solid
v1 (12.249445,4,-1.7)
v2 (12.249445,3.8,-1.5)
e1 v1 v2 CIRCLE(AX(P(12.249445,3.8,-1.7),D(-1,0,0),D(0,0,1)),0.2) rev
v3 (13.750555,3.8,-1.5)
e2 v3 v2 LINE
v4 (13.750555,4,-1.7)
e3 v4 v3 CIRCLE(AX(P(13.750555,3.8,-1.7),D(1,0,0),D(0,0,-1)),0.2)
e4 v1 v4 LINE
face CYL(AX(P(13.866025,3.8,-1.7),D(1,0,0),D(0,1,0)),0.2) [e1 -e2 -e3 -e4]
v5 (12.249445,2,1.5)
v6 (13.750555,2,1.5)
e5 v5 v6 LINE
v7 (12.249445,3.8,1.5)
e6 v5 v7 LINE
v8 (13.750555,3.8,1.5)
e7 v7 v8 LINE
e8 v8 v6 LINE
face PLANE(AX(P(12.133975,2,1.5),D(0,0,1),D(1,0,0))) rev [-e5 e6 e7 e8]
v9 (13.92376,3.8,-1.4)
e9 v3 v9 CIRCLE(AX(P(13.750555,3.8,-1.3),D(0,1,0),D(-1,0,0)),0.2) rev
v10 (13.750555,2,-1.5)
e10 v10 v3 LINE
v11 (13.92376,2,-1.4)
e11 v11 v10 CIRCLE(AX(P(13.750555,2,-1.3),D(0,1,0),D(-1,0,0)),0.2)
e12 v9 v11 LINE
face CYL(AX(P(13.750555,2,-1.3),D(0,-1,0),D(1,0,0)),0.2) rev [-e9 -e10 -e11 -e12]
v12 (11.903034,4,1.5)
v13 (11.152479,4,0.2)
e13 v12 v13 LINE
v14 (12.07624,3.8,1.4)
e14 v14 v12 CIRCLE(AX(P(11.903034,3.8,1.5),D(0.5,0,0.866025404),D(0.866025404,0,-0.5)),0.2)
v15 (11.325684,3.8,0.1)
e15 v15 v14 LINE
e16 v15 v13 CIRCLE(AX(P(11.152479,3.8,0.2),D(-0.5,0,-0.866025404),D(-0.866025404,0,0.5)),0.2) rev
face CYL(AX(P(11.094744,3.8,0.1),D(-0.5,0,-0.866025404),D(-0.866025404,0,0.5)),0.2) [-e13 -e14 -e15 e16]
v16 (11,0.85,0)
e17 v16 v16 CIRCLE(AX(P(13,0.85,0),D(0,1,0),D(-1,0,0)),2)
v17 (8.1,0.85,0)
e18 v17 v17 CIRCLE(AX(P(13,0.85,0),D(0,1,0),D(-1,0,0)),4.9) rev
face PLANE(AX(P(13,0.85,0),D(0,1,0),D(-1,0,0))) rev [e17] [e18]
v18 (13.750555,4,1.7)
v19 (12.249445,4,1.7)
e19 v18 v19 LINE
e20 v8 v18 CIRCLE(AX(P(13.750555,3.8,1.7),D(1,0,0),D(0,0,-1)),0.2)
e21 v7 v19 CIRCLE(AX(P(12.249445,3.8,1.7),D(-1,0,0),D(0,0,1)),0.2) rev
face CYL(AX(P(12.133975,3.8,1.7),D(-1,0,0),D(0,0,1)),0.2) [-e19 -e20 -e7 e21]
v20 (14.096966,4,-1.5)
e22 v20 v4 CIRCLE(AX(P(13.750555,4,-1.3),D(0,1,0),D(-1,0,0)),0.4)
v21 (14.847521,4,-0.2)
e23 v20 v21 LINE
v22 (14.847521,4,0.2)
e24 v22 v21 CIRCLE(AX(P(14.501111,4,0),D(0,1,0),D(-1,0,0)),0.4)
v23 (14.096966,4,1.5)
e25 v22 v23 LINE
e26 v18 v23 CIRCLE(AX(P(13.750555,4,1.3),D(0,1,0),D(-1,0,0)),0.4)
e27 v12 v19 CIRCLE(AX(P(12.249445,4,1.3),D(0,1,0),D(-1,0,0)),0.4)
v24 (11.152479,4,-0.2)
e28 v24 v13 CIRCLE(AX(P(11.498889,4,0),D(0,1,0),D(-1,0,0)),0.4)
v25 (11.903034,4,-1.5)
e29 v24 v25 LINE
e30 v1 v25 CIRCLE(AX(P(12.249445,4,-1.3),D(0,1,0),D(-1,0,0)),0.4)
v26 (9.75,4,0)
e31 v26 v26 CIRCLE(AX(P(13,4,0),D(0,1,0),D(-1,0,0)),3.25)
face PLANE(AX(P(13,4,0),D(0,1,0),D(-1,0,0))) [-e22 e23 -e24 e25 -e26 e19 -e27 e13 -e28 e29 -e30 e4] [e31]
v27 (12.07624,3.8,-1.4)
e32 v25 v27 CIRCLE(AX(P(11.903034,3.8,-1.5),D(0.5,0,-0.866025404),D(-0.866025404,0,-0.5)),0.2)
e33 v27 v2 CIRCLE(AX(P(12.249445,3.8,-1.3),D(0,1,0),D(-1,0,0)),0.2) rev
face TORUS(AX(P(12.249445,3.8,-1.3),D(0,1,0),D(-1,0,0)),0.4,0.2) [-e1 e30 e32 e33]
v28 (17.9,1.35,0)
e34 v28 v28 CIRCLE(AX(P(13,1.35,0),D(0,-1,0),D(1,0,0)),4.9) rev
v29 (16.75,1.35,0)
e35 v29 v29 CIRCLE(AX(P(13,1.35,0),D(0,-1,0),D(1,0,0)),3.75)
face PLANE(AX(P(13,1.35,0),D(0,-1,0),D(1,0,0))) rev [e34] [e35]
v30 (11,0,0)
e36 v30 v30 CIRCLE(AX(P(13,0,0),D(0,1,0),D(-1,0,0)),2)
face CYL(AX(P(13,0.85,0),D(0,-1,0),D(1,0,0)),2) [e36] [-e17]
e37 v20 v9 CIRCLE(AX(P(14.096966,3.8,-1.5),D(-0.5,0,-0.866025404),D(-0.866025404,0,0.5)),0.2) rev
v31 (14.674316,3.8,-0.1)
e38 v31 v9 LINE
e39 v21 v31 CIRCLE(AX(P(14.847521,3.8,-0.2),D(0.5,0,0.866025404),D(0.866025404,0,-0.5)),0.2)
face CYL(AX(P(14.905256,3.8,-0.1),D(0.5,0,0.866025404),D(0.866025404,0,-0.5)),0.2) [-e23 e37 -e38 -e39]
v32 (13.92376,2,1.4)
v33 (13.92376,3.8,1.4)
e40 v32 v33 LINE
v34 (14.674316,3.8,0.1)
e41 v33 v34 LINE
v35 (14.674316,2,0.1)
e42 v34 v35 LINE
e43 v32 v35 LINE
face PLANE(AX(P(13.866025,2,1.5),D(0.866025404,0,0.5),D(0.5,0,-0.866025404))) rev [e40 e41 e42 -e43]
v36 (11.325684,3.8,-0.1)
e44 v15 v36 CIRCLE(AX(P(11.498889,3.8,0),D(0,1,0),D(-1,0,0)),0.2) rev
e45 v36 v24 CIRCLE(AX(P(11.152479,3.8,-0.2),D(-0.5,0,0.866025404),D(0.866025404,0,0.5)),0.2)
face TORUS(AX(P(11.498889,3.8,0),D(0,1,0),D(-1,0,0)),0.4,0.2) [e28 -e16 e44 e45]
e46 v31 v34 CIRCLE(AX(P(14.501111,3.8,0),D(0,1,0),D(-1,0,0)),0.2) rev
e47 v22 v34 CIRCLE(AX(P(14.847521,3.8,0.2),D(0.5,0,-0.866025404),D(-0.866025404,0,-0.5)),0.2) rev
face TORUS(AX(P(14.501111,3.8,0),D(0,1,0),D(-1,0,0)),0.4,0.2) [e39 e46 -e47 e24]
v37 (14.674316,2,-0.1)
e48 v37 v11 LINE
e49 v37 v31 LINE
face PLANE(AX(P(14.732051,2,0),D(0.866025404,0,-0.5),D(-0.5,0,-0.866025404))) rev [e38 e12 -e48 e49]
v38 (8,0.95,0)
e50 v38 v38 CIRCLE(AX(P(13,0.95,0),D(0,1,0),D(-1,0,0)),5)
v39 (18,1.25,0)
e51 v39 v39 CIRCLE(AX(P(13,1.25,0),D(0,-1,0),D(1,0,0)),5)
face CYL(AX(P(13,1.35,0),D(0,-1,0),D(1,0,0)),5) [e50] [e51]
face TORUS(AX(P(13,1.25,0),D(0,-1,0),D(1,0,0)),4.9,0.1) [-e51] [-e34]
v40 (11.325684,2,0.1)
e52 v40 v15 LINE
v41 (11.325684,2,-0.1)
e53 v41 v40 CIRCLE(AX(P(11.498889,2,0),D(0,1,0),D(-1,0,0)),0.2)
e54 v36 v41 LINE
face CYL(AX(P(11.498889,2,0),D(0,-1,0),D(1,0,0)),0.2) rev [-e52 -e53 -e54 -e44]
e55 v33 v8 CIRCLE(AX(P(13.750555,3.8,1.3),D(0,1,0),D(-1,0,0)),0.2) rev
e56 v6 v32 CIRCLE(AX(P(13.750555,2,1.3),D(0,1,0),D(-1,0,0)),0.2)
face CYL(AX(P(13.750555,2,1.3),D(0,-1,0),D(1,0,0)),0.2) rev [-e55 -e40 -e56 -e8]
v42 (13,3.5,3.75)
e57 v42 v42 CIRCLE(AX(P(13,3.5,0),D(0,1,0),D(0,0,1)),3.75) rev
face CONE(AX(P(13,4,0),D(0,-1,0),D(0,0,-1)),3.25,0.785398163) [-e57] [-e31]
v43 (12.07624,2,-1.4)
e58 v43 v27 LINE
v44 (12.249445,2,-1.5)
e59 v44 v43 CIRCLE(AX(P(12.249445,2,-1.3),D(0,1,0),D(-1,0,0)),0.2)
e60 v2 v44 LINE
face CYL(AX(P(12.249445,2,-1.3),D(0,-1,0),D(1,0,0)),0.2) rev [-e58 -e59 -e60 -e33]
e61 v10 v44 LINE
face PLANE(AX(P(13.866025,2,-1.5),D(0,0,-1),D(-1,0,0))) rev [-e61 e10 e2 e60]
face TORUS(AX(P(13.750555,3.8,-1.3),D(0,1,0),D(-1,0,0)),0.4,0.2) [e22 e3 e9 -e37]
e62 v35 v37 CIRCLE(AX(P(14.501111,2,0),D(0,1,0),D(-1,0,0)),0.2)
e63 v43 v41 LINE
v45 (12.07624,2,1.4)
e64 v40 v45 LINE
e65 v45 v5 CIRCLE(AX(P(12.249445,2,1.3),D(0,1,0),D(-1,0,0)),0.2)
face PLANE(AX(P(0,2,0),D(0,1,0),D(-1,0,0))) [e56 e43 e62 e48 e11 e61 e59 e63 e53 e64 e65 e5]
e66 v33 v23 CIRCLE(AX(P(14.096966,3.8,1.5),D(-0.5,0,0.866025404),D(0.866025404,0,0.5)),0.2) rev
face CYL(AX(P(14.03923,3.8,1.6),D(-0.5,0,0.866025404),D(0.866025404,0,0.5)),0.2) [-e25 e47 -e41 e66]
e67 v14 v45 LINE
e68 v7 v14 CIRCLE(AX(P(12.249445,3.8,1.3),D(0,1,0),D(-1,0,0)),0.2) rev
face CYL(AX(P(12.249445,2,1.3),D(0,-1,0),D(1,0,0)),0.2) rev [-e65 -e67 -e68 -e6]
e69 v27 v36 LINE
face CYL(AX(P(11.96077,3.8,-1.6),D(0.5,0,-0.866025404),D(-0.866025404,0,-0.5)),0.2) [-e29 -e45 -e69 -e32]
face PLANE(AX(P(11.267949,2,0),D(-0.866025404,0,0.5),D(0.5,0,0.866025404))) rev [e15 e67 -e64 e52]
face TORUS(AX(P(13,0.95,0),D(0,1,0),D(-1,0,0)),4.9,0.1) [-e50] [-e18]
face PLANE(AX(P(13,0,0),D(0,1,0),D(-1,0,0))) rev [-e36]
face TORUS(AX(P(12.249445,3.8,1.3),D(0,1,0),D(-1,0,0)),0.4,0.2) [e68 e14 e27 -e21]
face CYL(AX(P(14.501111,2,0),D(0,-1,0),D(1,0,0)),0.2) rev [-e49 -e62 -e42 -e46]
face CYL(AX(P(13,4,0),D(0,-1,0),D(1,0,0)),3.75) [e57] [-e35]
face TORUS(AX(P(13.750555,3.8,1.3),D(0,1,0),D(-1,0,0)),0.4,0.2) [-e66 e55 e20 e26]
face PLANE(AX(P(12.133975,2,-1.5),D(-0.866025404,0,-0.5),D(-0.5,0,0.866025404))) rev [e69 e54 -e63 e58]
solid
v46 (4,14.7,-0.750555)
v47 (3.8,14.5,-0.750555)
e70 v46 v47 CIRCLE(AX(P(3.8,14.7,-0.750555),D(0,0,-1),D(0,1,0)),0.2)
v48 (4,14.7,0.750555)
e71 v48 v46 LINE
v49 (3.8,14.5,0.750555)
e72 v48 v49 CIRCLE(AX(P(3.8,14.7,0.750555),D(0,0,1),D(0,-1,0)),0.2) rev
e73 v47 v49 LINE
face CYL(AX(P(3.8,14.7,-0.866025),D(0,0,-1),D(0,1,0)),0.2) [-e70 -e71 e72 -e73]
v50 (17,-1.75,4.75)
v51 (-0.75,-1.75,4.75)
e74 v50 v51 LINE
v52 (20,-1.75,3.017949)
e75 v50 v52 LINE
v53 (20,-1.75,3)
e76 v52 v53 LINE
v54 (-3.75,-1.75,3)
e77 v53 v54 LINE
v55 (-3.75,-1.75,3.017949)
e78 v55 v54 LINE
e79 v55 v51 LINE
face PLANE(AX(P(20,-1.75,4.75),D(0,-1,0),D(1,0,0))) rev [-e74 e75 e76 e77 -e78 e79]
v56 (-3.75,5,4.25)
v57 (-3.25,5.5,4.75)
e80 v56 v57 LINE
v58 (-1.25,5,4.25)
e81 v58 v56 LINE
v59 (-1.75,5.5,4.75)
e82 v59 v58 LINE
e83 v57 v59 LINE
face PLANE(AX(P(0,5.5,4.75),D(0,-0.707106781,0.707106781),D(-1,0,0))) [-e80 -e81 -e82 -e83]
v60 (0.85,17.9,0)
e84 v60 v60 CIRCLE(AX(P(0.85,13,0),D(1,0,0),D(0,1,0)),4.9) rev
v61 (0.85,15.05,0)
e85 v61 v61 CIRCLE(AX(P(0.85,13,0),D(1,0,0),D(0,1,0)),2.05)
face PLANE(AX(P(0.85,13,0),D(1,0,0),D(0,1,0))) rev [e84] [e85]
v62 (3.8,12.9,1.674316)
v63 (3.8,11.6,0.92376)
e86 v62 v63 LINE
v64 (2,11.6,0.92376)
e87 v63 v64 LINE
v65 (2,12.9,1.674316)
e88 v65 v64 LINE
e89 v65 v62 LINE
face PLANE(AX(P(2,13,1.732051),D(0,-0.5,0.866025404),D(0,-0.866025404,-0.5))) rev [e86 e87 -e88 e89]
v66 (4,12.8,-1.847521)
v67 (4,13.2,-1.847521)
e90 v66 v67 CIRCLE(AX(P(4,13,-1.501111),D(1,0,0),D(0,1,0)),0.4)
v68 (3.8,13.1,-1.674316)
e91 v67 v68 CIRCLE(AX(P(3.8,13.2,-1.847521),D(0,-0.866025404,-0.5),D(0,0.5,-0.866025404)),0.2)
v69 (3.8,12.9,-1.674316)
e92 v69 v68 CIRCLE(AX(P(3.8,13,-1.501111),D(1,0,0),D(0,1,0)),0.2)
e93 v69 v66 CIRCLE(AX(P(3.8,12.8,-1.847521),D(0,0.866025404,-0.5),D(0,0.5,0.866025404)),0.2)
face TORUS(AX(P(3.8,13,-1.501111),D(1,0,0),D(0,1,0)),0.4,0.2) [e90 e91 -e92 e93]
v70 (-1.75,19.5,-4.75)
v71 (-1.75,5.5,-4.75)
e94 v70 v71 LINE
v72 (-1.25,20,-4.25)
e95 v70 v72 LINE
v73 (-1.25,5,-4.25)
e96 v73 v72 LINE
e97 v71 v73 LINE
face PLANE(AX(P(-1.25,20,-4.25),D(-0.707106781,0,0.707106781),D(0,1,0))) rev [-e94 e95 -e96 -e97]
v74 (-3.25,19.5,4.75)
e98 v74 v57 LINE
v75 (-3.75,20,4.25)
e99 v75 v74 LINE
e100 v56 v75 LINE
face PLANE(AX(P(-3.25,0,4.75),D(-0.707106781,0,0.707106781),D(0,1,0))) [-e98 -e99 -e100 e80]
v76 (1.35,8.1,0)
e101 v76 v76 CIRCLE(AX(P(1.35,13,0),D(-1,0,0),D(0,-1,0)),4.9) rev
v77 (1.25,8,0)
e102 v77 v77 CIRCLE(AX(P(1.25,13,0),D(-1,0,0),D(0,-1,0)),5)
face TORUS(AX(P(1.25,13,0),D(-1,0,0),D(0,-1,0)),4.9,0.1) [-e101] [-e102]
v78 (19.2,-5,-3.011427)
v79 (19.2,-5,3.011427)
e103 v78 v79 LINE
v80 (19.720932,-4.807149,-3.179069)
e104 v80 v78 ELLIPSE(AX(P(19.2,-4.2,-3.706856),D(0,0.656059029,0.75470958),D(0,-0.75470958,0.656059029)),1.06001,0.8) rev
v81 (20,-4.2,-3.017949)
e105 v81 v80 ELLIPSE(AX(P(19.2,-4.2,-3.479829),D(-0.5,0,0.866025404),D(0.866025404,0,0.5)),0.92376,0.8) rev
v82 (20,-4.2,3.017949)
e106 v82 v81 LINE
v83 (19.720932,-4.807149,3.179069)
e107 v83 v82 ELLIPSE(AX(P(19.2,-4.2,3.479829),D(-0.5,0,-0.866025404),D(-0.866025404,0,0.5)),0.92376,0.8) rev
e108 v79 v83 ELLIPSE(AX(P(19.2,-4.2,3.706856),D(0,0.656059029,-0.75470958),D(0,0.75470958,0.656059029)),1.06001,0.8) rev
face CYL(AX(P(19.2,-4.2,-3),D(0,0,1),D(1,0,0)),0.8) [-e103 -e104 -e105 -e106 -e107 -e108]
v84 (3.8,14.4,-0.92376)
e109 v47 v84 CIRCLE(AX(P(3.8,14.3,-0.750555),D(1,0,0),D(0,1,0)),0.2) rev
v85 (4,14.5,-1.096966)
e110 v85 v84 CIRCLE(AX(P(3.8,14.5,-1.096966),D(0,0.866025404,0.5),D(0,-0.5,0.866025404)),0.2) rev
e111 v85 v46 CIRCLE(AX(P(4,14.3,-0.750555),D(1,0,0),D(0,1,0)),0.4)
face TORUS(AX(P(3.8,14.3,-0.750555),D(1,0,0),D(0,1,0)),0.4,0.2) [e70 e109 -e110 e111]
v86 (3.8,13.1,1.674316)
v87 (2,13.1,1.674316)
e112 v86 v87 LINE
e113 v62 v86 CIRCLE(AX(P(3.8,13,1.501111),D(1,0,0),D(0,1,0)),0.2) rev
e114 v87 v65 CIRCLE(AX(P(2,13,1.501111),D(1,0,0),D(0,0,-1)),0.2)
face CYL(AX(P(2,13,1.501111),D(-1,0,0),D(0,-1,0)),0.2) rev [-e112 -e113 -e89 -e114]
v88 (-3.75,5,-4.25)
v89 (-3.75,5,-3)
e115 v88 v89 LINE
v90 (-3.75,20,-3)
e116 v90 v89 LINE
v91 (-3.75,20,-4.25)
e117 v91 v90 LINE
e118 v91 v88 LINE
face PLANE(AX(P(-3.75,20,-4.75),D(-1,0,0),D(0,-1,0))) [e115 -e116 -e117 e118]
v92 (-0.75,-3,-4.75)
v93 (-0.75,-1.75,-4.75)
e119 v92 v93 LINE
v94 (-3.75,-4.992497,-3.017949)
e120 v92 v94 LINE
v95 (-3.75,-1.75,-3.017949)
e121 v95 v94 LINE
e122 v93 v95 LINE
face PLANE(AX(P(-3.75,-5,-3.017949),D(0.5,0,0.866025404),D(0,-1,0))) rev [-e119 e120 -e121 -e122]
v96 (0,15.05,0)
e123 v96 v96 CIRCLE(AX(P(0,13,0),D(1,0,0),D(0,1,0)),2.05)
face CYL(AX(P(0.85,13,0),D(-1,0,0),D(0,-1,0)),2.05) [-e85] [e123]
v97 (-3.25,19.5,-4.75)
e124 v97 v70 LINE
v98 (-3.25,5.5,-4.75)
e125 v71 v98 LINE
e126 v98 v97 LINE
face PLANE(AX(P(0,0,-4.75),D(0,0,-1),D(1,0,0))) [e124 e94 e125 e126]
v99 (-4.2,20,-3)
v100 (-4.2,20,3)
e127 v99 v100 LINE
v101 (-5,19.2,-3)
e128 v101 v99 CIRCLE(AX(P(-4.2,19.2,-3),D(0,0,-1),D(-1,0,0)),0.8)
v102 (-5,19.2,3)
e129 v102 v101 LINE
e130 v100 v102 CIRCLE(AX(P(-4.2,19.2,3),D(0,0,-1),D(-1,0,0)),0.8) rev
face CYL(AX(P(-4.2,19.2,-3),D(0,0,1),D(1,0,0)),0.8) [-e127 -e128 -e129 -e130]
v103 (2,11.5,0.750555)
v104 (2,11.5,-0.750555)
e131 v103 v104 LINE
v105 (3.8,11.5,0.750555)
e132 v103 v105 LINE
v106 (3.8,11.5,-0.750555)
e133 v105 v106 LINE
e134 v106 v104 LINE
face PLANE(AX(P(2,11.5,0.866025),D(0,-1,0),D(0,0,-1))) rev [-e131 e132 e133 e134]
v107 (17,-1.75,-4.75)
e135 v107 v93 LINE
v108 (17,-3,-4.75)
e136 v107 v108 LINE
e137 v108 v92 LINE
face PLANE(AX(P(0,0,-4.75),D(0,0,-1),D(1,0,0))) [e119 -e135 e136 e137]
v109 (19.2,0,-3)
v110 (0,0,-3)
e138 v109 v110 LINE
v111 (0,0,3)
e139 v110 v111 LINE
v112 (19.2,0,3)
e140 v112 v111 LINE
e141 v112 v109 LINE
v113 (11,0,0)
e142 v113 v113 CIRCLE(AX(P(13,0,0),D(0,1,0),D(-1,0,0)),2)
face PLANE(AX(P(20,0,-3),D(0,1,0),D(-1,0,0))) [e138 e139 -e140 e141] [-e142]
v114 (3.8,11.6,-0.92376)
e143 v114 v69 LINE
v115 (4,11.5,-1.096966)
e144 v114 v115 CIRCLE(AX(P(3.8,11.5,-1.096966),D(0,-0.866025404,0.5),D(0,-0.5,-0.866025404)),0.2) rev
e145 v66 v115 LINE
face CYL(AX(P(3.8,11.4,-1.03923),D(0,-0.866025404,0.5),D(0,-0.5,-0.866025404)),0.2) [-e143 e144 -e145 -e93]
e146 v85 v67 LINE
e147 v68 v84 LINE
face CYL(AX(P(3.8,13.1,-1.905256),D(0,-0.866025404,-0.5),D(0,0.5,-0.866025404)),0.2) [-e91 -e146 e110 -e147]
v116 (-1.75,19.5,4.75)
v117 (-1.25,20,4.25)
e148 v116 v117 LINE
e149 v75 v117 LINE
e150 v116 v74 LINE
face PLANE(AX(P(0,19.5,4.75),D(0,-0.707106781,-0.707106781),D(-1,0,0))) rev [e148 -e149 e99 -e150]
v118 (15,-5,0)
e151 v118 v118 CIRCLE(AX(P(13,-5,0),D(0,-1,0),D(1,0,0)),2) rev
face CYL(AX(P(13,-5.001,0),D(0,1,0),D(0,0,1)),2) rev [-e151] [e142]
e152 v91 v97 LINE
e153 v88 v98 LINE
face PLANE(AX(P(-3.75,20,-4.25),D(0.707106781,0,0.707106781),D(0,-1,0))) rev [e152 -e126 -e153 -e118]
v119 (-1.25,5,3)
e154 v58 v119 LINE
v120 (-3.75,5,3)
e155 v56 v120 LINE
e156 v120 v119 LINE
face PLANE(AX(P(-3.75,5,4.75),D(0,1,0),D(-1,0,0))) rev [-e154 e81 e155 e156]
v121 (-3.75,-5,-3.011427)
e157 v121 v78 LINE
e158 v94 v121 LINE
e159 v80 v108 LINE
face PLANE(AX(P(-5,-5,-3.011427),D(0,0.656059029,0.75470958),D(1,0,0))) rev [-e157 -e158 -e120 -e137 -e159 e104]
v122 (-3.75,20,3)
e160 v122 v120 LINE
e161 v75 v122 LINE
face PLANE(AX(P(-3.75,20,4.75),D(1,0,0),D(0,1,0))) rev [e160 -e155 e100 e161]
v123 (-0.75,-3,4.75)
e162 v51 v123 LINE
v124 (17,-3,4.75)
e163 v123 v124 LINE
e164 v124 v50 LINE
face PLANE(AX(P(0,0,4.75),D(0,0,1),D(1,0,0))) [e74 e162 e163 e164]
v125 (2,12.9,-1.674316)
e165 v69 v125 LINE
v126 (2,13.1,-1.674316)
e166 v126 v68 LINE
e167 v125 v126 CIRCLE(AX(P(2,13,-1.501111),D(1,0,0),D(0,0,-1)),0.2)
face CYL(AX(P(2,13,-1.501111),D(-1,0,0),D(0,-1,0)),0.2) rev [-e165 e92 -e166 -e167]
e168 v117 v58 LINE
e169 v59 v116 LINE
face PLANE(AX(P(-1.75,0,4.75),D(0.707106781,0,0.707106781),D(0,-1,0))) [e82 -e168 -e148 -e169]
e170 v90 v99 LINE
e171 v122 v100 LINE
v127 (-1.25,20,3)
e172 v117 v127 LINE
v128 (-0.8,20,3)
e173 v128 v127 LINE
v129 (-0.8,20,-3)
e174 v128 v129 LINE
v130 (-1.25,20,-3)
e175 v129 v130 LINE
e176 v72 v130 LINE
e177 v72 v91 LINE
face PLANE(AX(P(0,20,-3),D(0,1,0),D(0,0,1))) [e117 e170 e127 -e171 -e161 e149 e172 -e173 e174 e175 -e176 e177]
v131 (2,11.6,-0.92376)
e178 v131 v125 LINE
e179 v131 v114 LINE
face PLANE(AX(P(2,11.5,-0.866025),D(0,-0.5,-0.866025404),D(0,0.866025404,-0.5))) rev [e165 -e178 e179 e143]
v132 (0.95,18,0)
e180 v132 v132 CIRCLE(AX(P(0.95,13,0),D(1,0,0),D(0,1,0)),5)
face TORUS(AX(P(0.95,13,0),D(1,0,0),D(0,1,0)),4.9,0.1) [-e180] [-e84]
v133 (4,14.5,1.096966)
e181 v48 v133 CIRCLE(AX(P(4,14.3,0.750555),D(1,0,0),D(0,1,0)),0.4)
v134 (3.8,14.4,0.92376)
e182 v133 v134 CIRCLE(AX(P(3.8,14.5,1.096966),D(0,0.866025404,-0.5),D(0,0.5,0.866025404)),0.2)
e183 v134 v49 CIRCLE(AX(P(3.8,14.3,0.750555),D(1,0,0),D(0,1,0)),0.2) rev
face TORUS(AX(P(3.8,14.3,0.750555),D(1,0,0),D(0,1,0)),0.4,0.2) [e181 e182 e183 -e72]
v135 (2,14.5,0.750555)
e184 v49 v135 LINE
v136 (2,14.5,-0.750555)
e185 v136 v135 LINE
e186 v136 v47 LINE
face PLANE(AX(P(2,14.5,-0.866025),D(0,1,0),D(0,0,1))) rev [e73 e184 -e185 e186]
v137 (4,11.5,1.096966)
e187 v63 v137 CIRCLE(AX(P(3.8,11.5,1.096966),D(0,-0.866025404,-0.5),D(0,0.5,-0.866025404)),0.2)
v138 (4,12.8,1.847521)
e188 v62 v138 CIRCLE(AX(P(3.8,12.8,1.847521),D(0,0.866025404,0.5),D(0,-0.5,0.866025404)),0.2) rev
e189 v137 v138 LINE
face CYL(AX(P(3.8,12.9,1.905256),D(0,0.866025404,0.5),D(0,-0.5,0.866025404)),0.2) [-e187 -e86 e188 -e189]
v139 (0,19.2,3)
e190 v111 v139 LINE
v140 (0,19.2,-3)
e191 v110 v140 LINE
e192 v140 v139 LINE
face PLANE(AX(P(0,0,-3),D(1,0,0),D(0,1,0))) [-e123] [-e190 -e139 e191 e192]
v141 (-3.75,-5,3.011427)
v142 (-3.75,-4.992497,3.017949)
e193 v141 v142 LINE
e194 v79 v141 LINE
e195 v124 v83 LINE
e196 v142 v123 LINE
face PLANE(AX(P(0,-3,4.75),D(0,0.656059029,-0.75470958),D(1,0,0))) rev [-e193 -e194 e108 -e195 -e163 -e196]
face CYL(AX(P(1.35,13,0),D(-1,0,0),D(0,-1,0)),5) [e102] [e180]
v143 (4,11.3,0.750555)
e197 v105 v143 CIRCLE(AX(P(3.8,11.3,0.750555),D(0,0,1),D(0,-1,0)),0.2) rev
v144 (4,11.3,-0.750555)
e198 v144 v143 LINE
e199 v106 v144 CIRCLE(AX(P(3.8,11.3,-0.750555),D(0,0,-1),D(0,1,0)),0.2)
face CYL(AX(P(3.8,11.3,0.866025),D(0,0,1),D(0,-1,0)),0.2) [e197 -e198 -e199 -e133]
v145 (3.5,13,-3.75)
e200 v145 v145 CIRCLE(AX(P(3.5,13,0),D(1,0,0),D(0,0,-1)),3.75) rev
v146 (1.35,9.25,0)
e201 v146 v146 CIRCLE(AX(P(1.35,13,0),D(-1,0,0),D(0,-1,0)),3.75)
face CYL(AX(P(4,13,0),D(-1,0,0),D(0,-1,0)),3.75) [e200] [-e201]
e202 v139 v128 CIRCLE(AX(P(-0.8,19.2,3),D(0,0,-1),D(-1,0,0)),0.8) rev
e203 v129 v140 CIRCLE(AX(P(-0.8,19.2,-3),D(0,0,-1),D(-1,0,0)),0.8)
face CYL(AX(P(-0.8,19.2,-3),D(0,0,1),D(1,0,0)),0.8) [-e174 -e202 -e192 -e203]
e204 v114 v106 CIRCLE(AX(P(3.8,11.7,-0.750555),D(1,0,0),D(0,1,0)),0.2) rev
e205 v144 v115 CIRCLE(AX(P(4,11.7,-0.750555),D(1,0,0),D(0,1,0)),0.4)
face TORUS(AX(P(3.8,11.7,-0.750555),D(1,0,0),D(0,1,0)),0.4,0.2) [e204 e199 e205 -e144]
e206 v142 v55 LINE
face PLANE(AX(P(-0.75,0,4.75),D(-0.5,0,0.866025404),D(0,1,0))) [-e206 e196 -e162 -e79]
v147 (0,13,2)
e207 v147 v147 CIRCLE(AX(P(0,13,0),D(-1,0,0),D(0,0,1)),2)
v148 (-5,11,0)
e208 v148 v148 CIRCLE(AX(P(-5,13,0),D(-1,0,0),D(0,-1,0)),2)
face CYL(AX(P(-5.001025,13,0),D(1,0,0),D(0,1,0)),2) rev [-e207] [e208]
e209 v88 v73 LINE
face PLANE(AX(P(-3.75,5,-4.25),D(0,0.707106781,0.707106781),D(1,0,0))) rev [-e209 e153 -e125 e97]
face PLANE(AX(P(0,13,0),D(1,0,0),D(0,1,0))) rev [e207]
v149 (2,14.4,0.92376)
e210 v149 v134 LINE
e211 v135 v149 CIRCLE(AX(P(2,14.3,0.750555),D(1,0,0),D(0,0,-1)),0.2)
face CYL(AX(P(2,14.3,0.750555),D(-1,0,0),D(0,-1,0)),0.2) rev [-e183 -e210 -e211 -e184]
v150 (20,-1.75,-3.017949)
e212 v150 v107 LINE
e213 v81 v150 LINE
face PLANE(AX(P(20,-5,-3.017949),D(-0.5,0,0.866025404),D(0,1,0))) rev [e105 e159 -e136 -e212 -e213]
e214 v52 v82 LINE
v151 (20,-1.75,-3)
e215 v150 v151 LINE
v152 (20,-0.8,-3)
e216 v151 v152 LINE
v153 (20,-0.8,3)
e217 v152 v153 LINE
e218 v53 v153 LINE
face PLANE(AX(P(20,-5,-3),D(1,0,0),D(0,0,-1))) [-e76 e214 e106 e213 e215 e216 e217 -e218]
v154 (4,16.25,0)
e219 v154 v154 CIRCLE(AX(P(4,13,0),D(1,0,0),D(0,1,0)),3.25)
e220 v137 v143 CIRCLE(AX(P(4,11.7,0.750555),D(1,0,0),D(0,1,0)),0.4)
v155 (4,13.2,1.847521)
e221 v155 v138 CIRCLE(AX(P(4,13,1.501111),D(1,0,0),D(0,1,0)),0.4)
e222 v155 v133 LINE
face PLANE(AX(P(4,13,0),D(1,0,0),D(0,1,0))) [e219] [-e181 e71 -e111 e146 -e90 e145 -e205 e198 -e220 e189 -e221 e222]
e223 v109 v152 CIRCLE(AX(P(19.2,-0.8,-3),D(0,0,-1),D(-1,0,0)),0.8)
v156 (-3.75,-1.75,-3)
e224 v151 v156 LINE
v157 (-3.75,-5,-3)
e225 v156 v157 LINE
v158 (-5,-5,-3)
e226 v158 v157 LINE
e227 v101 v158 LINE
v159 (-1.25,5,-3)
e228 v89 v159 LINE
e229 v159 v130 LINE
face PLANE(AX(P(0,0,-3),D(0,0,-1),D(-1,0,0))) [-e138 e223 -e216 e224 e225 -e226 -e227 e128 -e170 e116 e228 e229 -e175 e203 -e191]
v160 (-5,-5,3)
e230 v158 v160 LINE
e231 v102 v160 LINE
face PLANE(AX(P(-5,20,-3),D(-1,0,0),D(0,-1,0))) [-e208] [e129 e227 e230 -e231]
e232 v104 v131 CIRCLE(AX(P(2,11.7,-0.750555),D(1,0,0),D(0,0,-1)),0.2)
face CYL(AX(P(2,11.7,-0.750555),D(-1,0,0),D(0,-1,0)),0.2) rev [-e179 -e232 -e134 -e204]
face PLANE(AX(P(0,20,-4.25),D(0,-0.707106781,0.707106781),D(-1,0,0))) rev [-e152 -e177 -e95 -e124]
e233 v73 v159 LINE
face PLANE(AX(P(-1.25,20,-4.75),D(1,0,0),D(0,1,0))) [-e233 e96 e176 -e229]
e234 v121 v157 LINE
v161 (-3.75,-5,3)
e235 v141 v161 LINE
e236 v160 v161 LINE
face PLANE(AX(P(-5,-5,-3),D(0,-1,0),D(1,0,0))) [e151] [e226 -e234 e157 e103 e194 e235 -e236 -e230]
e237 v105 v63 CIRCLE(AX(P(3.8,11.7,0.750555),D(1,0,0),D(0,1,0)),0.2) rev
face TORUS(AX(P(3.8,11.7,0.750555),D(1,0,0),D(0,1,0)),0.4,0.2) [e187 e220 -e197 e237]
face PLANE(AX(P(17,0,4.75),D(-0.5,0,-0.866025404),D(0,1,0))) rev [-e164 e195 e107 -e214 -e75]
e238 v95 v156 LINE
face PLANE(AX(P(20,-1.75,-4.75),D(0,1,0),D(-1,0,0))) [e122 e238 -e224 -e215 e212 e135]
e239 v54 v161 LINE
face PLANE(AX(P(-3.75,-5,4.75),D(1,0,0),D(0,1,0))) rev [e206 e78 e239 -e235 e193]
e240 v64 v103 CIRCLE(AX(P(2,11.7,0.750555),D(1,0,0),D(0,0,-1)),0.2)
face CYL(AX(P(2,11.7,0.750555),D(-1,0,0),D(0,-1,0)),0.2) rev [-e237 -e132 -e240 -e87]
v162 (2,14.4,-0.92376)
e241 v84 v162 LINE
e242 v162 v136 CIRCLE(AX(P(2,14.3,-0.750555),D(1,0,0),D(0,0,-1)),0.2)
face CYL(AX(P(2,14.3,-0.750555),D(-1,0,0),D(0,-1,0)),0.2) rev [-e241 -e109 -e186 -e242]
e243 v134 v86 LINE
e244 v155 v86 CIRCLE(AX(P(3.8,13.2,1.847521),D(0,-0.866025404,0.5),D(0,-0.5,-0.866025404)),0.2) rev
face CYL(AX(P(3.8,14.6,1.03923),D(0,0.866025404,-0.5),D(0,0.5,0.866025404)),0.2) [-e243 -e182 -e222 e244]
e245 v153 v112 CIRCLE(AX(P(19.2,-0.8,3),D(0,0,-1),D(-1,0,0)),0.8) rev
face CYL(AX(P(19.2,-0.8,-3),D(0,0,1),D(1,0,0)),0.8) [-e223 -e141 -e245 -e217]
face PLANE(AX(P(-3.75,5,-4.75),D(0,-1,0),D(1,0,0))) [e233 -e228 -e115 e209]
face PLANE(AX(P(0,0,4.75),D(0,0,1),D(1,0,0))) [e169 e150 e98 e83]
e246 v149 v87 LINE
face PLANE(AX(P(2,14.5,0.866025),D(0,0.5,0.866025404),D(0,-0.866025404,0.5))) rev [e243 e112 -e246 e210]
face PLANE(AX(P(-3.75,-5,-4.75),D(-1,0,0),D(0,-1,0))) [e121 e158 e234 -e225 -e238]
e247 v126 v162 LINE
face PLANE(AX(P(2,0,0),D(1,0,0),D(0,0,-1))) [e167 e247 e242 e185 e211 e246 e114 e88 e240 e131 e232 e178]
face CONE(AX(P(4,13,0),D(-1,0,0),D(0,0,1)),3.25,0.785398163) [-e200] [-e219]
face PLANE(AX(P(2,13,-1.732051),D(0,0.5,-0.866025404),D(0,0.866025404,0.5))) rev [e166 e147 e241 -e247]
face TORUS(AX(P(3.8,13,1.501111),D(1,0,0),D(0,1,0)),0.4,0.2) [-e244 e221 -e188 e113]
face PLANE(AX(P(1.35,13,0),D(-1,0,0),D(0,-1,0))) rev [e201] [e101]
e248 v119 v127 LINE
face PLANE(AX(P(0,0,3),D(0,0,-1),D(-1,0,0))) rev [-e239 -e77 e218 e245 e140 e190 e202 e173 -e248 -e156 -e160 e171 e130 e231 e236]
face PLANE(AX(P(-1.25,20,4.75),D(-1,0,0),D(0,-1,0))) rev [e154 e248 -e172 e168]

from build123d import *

# Parameters (mm, degrees)
EXTRUDE1_DEPTH      = 3
EXTRUDE1_DEPTH_BACK = 3
SKETCH2_W           = 2.5
SKETCH2_H           = 15
SKETCH2_W_2         = 23.75
SKETCH2_H_2         = 3.25
EXTRUDE2_DEPTH      = 1.75
CHAMFER1_SIZE       = 3
CHAMFER1_SIZE2      = 1.732050808
CHAMFER2_SIZE       = 2
CHAMFER2_SIZE2      = 1.738573476
CHAMFER3_SIZE       = 0.5
EXTRUDE3_REACH      = 30.68
SKETCH4_R           = 2
FILLET1_R           = 0.8
SKETCH5_R           = 3.75
BOSS_EXTRUDE1_DEPTH = 4
CHAMFER4_SIZE       = 0.5
CUT_EXTRUDE1_DEPTH  = 2
FILLET2_R           = 0.2
SKETCH7_R           = 3.75
BOSS_EXTRUDE2_DEPTH = 4
CHAMFER5_SIZE       = 0.5
CUT_EXTRUDE2_DEPTH  = 2
FILLET3_R           = 0.2
CUT_EXTRUDE3_START  = 0.85
SKETCH9_R           = 4.868453385
SKETCH9_R_2         = 2
CUT_EXTRUDE3_DEPTH  = 0.85
SKETCH10_R          = 4.694826999
SKETCH10_R_2        = 2.05
CUT_EXTRUDE8_DEPTH  = 0.85
CHAMFER6_SIZE       = 0.2
CHAMFER7_SIZE       = 0.2
SKETCH12_R          = 5
BOSS_EXTRUDE3_DEPTH = 0.5
SKETCH13_R          = 5
BOSS_EXTRUDE4_DEPTH = 0.5
FILLET4_R           = 0.1
FILLET5_R           = 0.1


# Read off the part's stored shape, not the designer's step: Mirror1
with BuildPart() as part:
    # Sketch1 → Extrude1 (new, two sides: drawn at the far end of the back side and taken through both)
    with BuildSketch(Plane.XY.offset(-EXTRUDE1_DEPTH_BACK)):
        Polygon((0, 0), (0, 20), (-5, 20), (-5, -5), (20, -5), (20, 0), align=None)
    extrude(amount=EXTRUDE1_DEPTH + EXTRUDE1_DEPTH_BACK)

    # Sketch2 → Extrude2 (add)
    with BuildSketch(Plane.XY.offset(3)):
        with Locations((-2.5, 12.5)):
            Rectangle(SKETCH2_W, SKETCH2_H)
        with Locations((8.125, -3.375)):
            Rectangle(SKETCH2_W_2, SKETCH2_H_2)
    extrude(amount=EXTRUDE2_DEPTH)

    # Chamfer1
    chamfer1_edges = [part.edges().sort_by_distance(p)[0] for p in [
        (20, -3.375, 4.75),
        (-3.75, -3.375, 4.75),
    ]]
    chamfer1_side = [part.faces().sort_by_distance(p)[0] for p in [
        (8.125, -3.375, 4.75),
    ]]
    chamfer(chamfer1_edges, length=CHAMFER1_SIZE, length2=CHAMFER1_SIZE2, reference=chamfer1_side[0])

    # Chamfer2
    chamfer2_edges = [part.edges().sort_by_distance(p)[0] for p in [
        (8.125, -5, 4.75),
    ]]
    chamfer2_side = [part.faces().sort_by_distance(p)[0] for p in [
        (8.125, -3.375, 4.75),
    ]]
    chamfer(chamfer2_edges, length=CHAMFER2_SIZE, length2=CHAMFER2_SIZE2, reference=chamfer2_side[0])

    # Chamfer3
    chamfer3_edges = [part.edges().sort_by_distance(p)[0] for p in [
        (-2.5, 20, 4.75),
        (-1.25, 12.5, 4.75),
        (-2.5, 5, 4.75),
        (-3.75, 12.5, 4.75),
    ]]
    chamfer(chamfer3_edges, length=CHAMFER3_SIZE)

    # Mirror1: part across plane


with BuildPart() as part_1:
    add(part.part)
    add(part.part.mirror(Plane.XY))

    # Sketch4 → Extrude3 (cut, up to next)
    with BuildSketch(Plane(origin=(0, 0, 0), x_dir=(1, 0, 0), z_dir=(0, 1, 0)), mode=Mode.PRIVATE) as extrude3_sk1:
        with Locations(Location((13, 0, 0), (0, 0, 270))):
            Circle(SKETCH4_R)
    extrude3_tool1 = extrude(extrude3_sk1.sketch, amount=-EXTRUDE3_REACH, mode=Mode.PRIVATE) & part_1.part
    extrude3 = extrude3_tool1.solids().sort_by_distance((13, 0, 0))[0]
    add(extrude3, mode=Mode.SUBTRACT)

    # Mirror2: Extrude3 across plane
    add(extrude3.mirror(Plane(origin=(0, 0, 0), x_dir=(0, 0, 1), z_dir=(0.7071067811865476, -0.7071067811865475, 0))), mode=Mode.SUBTRACT)

    # Fillet1
    fillet1_edges = [part_1.edges().sort_by_distance(p)[0] for p in [
        (-5, 20, 0),
        (20, -5, 0),
        (20, 0, 0),
        (0, 20, 0),
    ]]
    fillet(fillet1_edges, radius=FILLET1_R)

    # Sketch5 → Boss-Extrude1 (add)
    with BuildSketch(Plane(origin=(0, 0, 0), x_dir=(1, 0, 0), z_dir=(0, 1, 0))):
        with Locations(Location((13, 0, 0), (0, 0, 306.869897646))):
            Circle(SKETCH5_R)
    extrude(amount=BOSS_EXTRUDE1_DEPTH)

    # Chamfer4
    chamfer4_edges = [part_1.edges().sort_by_distance(p)[0] for p in [
        (10.75, 4, -3),
    ]]
    chamfer(chamfer4_edges, length=CHAMFER4_SIZE)

    # Sketch6 → Cut-Extrude1 (cut)
    with BuildSketch(Plane(origin=(0, 4, 0), x_dir=(1, 0, 0), z_dir=(0, 1, 0))):
        Polygon((14.732050808, 0), (13.866025404, 1.5), (12.133974596, 1.5), (11.267949192, 0), (12.133974596, -1.5), (13.866025404, -1.5), align=None)
    extrude(amount=-CUT_EXTRUDE1_DEPTH, mode=Mode.SUBTRACT)

    # Fillet2
    fillet2_edges = [part_1.edges().sort_by_distance(p)[0] for p in [
        (14.732050808, 3, 0),
        (13.866025404, 3, 1.5),
        (12.133974596, 3, 1.5),
        (11.267949192, 3, 0),
        (12.133974596, 3, -1.5),
        (13.866025404, 3, -1.5),
        (14.299038106, 4, 0.75),
        (14.299038106, 4, -0.75),
        (13, 4, -1.5),
        (11.700961894, 4, -0.75),
        (11.700961894, 4, 0.75),
        (13, 4, 1.5),
    ]]
    fillet(fillet2_edges, radius=FILLET2_R)

    # Sketch7 → Boss-Extrude2 (add)
    with BuildSketch(Plane(origin=(0, 0, 0), x_dir=(0, 0, -1), z_dir=(1, 0, 0))):
        with Locations(Location((0, 13, 0), (0, 0, 216.869897646))):
            Circle(SKETCH7_R)
    extrude(amount=BOSS_EXTRUDE2_DEPTH)

    # Chamfer5
    chamfer5_edges = [part_1.edges().sort_by_distance(p)[0] for p in [
        (4, 15.25, -3),
    ]]
    chamfer(chamfer5_edges, length=CHAMFER5_SIZE)

    # Sketch8 → Cut-Extrude2 (cut)
    with BuildSketch(Plane(origin=(4, 0, 0), x_dir=(0, 0, -1), z_dir=(1, 0, 0))):
        Polygon((1.732050808, 13), (0.866025404, 14.5), (-0.866025404, 14.5), (-1.732050808, 13), (-0.866025404, 11.5), (0.866025404, 11.5), align=None)
    extrude(amount=-CUT_EXTRUDE2_DEPTH, mode=Mode.SUBTRACT)

    # Fillet3
    fillet3_edges = [part_1.edges().sort_by_distance(p)[0] for p in [
        (3, 13, -1.732050808),
        (3, 11.5, -0.866025404),
        (3, 11.5, 0.866025404),
        (3, 13, 1.732050808),
        (3, 14.5, 0.866025404),
        (3, 14.5, -0.866025404),
        (4, 12.25, -1.299038106),
        (4, 13.75, -1.299038106),
        (4, 14.5, 0),
        (4, 13.75, 1.299038106),
        (4, 12.25, 1.299038106),
        (4, 11.5, 0),
    ]]
    fillet(fillet3_edges, radius=FILLET3_R)

    # Sketch9 → Cut-Extrude3 (cut)
    with BuildSketch(Plane(origin=(0, 0, 0), x_dir=(1, 0, 0), z_dir=(0, 1, 0)).offset(CUT_EXTRUDE3_START)):
        with Locations((13, 0)):
            Circle(SKETCH9_R)
        with Locations((13, 0)):
            Circle(SKETCH9_R_2, mode=Mode.SUBTRACT)
    extrude(amount=-CUT_EXTRUDE3_DEPTH, mode=Mode.SUBTRACT)


with BuildPart() as cut_extrude3_piece_1:
    # of the separate pieces the step leaves, piece 1, a body of its own (cut_extrude3_pieces)
    add(part_1.part.solids().sort_by_distance((4, 11.5, -1.096965511))[0])

    # Sketch10 → Cut-Extrude8 (cut)
    with BuildSketch(Plane(origin=(0, 0, 0), x_dir=(0, 0, -1), z_dir=(1, 0, 0))):
        with Locations((0, 13)):
            Circle(SKETCH10_R)
        with Locations(Location((0, 13, 0), (0, 0, 90))):
            Circle(SKETCH10_R_2, mode=Mode.SUBTRACT)
    extrude(amount=CUT_EXTRUDE8_DEPTH, mode=Mode.SUBTRACT)

    # Chamfer6
    chamfer6_edges = [cut_extrude3_piece_1.edges().sort_by_distance(p)[0] for p in [
        (0.85, 15.25, -3),
    ]]
    chamfer(chamfer6_edges, length=CHAMFER6_SIZE)

    # Sketch12 → Boss-Extrude3 (add)
    with BuildSketch(Plane.ZY.offset(-0.85)):
        with Locations(Location((0, 13, 0), (0, 0, 270))):
            Circle(SKETCH12_R)
    extrude(amount=-BOSS_EXTRUDE3_DEPTH)

    # Fillet5
    fillet5_edges = [cut_extrude3_piece_1.edges().sort_by_distance(p)[0] for p in [
        (1.35, 18, 0),
        (0.85, 18, 0),
    ]]
    fillet(fillet5_edges, radius=FILLET5_R)


with BuildPart() as cut_extrude3_piece_2:
    # of the separate pieces the step leaves, piece 2, a body of its own (cut_extrude3_pieces)
    add(part_1.part.solids().sort_by_distance((15, 0.85, 0))[0])

    # Chamfer7
    chamfer7_edges = [cut_extrude3_piece_2.edges().sort_by_distance(p)[0] for p in [
        (10.75, 0.85, -3),
    ]]
    chamfer(chamfer7_edges, length=CHAMFER7_SIZE)

    # Sketch13 → Boss-Extrude4 (add)
    with BuildSketch(Plane.XZ.offset(-0.85)):
        with Locations((13, 0)):
            Circle(SKETCH13_R)
    extrude(amount=-BOSS_EXTRUDE4_DEPTH)

    # Fillet4
    fillet4_edges = [cut_extrude3_piece_2.edges().sort_by_distance(p)[0] for p in [
        (8, 1.35, 0),
        (8, 0.85, 0),
    ]]
    fillet(fillet4_edges, radius=FILLET4_R)


solid = Compound([cut_extrude3_piece_1.part, cut_extrude3_piece_2.part])
